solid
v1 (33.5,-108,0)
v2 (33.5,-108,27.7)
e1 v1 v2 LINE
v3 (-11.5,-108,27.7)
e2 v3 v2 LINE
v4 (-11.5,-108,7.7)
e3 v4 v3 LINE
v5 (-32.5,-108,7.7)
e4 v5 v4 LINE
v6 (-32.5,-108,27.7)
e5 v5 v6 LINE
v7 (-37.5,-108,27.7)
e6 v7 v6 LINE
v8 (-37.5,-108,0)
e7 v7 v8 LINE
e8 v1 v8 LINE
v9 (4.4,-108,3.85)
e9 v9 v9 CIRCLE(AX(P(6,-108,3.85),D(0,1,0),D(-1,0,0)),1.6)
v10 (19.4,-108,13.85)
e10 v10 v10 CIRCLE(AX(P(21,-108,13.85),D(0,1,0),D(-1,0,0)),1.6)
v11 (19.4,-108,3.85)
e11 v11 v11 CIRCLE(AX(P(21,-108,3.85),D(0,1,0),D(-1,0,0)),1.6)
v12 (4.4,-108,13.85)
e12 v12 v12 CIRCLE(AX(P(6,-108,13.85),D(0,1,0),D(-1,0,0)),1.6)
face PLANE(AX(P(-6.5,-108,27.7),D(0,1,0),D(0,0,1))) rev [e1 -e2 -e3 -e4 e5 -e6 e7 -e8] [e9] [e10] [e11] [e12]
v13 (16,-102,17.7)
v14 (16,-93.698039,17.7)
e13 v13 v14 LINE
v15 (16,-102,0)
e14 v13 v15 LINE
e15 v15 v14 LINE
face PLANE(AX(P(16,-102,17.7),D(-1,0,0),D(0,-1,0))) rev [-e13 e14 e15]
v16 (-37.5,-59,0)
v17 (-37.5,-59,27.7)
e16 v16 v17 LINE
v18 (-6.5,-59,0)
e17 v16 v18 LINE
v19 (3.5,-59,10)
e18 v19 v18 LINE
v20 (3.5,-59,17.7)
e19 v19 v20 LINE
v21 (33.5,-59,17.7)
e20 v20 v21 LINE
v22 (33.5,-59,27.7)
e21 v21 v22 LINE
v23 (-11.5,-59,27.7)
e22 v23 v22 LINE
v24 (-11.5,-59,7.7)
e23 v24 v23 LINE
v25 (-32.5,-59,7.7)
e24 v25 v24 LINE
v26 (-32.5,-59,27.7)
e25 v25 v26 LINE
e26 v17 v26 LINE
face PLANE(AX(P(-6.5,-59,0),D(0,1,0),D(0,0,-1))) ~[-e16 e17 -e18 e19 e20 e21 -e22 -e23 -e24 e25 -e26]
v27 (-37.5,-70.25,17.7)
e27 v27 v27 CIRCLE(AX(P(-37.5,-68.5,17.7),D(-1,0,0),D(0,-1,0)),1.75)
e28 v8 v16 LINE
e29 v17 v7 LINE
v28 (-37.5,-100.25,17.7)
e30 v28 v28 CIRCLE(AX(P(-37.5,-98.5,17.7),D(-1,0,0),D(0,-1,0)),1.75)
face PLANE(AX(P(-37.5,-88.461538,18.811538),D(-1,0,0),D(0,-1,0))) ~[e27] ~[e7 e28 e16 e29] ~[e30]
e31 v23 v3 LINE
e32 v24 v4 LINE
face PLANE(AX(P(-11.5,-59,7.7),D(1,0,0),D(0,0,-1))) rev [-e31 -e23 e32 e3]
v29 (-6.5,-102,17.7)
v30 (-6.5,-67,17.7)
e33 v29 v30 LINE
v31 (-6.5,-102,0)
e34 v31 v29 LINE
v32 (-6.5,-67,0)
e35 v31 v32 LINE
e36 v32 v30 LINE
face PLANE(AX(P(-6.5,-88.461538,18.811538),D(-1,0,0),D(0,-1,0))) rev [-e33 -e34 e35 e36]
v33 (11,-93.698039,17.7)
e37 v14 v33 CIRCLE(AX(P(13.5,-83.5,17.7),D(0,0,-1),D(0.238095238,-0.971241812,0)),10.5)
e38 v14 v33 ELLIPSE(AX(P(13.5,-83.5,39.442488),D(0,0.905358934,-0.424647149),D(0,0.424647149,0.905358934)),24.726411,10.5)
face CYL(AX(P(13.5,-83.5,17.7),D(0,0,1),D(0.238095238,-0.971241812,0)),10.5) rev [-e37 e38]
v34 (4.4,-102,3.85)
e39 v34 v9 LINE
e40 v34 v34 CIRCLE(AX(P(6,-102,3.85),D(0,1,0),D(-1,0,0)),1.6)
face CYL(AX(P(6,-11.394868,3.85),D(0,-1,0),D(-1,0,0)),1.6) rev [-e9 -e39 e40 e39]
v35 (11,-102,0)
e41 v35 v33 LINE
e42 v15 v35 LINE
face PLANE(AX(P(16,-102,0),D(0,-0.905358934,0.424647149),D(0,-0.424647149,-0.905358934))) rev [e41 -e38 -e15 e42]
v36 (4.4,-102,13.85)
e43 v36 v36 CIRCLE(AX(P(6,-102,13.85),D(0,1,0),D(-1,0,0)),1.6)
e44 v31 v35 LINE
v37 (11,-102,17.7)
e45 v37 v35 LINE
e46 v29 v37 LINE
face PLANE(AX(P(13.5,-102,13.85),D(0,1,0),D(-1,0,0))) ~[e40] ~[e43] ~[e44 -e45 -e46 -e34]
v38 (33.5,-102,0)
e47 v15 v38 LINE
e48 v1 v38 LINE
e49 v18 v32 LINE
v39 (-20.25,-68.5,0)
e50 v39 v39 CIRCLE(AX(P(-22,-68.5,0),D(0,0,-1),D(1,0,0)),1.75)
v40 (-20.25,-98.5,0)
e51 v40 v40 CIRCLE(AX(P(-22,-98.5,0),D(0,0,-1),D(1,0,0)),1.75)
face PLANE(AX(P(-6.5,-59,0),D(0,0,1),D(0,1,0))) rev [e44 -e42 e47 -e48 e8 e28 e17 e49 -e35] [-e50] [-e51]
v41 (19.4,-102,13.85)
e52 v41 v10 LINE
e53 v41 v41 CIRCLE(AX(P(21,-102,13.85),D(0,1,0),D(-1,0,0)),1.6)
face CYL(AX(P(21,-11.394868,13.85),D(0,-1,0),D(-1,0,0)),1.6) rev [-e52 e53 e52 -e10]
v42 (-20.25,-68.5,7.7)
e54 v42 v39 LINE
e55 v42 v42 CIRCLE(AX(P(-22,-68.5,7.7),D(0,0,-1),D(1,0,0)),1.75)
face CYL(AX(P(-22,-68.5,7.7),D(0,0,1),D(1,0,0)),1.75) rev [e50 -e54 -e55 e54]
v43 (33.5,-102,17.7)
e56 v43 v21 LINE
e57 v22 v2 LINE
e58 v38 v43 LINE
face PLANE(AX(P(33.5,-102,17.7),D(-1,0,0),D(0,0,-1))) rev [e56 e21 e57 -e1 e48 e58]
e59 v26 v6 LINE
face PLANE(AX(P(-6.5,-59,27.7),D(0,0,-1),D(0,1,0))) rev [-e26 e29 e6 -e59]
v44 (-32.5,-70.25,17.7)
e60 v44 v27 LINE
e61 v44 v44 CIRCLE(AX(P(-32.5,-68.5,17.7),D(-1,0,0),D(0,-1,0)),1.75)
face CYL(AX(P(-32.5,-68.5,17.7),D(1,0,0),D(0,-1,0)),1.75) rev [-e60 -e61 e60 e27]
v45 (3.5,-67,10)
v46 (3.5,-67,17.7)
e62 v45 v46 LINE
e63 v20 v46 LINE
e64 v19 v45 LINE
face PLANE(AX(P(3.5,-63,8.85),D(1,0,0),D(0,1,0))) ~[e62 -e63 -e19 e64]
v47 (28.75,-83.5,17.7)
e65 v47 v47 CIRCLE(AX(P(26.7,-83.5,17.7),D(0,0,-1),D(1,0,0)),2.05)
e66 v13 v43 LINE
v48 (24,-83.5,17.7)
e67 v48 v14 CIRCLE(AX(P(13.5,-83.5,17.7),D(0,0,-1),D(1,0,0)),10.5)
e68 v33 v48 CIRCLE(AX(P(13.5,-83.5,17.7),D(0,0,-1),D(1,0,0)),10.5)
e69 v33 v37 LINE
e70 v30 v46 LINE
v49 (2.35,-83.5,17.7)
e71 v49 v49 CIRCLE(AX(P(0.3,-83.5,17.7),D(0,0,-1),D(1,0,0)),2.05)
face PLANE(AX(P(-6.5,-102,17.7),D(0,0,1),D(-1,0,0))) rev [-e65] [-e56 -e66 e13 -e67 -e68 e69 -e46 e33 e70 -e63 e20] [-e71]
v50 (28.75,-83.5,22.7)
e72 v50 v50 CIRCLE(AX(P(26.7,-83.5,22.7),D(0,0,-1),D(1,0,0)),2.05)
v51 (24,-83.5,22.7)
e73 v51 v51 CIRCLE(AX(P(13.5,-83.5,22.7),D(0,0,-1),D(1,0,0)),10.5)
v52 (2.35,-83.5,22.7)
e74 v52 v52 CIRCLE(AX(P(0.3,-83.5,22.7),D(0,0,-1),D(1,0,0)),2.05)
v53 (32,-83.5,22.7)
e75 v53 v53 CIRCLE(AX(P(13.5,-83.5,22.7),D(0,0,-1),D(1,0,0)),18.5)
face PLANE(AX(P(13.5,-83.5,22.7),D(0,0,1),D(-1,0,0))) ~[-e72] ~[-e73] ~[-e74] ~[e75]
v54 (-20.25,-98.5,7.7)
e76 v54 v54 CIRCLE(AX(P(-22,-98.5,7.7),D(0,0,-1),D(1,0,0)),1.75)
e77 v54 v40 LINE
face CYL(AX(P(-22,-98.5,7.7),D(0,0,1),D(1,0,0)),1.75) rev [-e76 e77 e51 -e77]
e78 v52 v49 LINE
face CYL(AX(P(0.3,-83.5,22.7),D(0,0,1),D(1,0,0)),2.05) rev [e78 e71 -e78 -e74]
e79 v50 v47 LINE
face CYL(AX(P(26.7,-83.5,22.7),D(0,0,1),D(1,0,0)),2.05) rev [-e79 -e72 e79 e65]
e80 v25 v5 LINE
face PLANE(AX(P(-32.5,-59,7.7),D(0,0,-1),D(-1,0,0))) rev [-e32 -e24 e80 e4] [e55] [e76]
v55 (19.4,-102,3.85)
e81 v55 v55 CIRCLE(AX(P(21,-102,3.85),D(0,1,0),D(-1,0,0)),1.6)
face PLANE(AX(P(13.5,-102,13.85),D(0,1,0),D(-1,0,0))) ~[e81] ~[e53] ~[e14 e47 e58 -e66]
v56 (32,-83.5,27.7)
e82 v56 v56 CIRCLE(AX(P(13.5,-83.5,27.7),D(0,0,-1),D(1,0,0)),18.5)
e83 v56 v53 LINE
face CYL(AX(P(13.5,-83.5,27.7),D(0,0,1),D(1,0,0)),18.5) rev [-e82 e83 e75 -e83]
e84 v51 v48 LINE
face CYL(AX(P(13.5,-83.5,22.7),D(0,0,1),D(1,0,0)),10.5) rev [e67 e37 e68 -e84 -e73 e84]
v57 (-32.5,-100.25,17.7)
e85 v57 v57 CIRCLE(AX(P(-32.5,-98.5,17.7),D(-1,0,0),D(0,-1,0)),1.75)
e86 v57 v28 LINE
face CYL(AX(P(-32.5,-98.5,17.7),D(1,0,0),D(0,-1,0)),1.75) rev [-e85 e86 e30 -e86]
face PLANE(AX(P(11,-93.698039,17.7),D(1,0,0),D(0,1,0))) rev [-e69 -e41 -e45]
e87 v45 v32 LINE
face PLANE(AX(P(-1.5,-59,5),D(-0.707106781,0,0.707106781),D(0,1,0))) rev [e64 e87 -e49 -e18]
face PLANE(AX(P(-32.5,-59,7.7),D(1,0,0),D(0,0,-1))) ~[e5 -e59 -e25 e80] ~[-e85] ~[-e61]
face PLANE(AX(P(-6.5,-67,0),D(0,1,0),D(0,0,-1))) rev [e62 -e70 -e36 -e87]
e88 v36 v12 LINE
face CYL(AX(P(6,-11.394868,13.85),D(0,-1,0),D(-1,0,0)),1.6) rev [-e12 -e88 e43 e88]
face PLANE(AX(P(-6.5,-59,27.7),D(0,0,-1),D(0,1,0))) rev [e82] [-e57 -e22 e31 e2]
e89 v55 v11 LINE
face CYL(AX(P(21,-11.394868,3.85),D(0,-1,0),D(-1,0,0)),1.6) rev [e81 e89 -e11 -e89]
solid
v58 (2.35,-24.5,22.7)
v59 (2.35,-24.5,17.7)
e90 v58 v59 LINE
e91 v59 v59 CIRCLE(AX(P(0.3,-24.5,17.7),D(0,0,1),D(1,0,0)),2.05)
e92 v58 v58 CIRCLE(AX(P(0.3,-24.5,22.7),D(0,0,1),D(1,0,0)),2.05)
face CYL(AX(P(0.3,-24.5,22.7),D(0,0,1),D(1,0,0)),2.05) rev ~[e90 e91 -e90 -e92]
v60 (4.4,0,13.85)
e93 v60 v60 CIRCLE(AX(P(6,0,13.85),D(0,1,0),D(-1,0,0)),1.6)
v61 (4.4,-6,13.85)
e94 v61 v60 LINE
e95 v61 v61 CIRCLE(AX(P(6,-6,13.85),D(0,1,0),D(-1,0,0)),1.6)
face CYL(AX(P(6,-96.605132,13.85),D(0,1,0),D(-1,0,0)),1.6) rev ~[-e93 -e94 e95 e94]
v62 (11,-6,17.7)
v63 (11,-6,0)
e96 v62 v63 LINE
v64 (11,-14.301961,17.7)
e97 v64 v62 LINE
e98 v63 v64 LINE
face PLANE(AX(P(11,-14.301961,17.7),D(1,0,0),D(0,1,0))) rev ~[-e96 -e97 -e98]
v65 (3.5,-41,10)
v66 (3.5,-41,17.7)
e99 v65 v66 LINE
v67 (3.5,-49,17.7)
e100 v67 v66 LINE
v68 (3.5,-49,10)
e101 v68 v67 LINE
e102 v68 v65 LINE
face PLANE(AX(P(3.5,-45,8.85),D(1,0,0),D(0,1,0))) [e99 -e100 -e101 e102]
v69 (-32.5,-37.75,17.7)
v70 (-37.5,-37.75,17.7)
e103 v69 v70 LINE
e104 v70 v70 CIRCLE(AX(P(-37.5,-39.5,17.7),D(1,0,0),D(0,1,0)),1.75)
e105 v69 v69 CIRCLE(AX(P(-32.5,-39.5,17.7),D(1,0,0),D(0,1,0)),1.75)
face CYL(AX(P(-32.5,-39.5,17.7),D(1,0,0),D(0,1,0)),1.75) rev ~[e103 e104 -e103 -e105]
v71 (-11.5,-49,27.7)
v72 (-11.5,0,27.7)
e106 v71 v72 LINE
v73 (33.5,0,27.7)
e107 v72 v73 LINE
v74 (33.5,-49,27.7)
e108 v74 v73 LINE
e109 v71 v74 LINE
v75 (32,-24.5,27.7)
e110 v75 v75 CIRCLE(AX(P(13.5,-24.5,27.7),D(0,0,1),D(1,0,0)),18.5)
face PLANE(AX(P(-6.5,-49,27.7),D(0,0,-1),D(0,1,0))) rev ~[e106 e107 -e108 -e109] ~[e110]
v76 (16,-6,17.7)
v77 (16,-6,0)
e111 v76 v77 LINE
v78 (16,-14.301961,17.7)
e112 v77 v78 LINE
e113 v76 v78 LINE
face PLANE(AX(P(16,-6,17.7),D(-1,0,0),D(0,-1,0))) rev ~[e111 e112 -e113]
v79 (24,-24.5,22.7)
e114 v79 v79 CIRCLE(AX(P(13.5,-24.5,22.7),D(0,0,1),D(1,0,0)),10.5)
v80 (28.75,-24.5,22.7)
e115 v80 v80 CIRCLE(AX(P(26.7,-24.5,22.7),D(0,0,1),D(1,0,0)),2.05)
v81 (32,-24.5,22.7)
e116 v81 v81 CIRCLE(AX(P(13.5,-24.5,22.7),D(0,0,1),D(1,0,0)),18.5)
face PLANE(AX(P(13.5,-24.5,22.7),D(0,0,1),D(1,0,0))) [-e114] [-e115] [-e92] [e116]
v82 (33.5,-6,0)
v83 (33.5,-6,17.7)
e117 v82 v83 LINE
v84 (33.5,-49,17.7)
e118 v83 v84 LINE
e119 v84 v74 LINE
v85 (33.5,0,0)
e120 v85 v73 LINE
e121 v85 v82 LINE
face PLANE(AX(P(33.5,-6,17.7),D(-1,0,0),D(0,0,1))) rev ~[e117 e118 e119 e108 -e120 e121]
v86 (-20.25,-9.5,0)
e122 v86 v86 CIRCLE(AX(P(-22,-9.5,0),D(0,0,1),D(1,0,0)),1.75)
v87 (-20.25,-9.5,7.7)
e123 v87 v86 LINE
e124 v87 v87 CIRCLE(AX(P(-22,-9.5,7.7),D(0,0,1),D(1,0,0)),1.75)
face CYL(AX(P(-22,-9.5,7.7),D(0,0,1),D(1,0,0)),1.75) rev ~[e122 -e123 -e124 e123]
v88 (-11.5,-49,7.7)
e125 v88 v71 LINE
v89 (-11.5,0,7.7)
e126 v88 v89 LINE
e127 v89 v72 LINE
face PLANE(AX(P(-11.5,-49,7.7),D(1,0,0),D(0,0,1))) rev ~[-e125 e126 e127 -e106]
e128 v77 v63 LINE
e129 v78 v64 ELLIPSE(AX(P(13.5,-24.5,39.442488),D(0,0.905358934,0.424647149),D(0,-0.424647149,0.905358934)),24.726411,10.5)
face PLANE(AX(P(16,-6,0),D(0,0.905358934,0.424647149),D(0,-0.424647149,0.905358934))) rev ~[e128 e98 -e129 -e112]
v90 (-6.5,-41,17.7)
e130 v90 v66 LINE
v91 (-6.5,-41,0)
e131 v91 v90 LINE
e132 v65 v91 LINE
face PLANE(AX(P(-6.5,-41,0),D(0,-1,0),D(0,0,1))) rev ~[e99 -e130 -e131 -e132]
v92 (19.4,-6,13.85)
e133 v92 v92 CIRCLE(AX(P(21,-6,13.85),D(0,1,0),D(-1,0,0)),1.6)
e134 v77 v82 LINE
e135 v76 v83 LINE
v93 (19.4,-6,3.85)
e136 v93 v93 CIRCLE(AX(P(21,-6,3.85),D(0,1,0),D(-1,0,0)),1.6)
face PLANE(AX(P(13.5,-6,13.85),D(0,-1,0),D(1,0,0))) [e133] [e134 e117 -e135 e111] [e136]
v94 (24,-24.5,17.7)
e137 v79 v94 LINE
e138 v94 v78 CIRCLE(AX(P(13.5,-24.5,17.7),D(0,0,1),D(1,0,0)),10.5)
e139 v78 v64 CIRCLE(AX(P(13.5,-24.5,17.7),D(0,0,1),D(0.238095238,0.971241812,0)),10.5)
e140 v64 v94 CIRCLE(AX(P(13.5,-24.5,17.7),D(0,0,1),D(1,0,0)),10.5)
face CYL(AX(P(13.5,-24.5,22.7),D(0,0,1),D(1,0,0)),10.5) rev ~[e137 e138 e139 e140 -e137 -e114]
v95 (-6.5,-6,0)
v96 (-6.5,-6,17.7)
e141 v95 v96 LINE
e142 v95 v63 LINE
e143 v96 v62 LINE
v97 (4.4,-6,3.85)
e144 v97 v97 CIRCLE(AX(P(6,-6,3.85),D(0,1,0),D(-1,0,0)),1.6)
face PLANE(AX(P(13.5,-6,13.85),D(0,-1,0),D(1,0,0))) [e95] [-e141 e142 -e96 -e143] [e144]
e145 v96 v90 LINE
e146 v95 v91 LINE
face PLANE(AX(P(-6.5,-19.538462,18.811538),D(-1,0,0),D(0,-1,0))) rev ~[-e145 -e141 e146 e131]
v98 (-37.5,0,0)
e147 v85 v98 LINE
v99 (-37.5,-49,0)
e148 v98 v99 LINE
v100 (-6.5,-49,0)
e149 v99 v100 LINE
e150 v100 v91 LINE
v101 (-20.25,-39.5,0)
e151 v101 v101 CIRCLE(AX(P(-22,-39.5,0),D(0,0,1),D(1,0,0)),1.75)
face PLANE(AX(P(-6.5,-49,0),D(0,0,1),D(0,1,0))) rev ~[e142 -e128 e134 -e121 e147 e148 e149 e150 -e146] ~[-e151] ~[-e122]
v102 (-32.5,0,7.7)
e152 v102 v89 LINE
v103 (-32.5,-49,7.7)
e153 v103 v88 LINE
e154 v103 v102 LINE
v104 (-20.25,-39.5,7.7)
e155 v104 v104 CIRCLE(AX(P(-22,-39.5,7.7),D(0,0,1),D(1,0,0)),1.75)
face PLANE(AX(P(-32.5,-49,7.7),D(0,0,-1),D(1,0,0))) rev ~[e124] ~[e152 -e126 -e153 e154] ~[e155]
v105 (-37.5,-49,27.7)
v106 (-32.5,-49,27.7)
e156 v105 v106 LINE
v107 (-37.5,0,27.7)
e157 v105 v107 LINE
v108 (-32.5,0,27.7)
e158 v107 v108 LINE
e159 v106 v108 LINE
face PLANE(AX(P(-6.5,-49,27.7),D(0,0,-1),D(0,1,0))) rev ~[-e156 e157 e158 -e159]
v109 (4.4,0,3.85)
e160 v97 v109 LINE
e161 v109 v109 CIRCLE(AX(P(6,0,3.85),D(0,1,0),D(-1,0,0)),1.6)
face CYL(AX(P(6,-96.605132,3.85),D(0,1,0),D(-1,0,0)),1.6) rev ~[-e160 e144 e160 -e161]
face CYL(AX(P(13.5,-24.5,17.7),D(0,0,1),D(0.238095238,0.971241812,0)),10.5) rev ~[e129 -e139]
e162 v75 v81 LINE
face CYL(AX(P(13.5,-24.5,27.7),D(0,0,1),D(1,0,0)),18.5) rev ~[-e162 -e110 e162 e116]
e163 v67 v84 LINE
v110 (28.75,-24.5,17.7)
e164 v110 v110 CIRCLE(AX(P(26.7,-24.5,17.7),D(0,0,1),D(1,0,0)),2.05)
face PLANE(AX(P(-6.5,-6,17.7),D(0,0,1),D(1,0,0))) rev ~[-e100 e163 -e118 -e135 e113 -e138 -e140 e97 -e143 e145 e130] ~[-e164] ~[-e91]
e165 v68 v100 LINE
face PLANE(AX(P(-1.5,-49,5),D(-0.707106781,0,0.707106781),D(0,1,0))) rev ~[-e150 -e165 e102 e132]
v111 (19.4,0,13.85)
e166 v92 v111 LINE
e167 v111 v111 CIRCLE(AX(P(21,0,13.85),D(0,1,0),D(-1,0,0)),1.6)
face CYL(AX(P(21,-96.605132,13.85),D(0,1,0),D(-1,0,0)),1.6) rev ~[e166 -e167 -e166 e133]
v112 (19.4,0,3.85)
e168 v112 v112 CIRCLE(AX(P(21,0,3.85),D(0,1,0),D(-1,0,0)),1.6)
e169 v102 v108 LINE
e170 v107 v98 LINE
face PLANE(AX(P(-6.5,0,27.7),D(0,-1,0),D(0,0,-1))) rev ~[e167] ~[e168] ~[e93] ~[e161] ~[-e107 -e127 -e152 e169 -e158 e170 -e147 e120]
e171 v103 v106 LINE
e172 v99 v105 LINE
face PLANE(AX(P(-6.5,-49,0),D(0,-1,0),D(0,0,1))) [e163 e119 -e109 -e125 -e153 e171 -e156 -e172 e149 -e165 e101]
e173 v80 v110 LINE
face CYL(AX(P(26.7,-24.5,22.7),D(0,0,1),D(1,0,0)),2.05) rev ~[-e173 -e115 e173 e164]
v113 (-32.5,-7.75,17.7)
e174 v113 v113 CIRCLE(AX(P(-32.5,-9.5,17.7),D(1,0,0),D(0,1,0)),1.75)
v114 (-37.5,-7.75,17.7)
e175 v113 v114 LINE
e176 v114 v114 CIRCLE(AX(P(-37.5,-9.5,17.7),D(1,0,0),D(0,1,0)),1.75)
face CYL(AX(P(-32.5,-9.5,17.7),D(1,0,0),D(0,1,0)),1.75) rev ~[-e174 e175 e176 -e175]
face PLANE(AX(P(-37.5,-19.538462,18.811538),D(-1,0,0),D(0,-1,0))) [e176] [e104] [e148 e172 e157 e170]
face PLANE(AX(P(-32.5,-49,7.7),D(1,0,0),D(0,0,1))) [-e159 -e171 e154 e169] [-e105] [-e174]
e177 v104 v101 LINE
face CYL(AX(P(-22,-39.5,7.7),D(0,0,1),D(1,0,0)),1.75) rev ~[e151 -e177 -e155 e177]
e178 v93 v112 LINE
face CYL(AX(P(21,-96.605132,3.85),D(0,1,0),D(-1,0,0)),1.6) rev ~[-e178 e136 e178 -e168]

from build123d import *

# Parameters (mm, degrees)
F0_W      = 40
F0_H      = 27.7
F1_DEPTH  = 6
F2_W      = 40
F2_H      = 10
F3_DEPTH  = 43
F4_R      = 18.5
F5_DEPTH  = 5
F6_R      = 10.5
F6_R_2    = 2.05
F7_DEPTH  = 22.701
F8_W      = 43
F8_H      = 17.7
F9_DEPTH  = 31
F10_W     = 21
F10_H     = 20
F11_DEPTH = 49.001
F13_DEPTH = 17.7
F15_DEPTH = 5
F16_W     = 8
F16_H     = 17.7
F17_DEPTH = 10
F18_R     = 1.75
F19_DEPTH = 7.701
F20_R     = 1.75
F21_DEPTH = 5.001
F23_D     = 3.2
F24_SIZE  = 10


# Not quite as in the source:
# - a feature names something its author has since deleted; it is built from what else it names


with BuildPart() as f1:
    # F0 (on Front) → F1 (new body)
    with BuildSketch(Plane.XZ):
        with Locations((13.5, 13.85)):
            Rectangle(F0_W, F0_H)
    extrude(amount=F1_DEPTH)

    # F2 (on face) → F3 (join)
    with BuildSketch(Plane.XZ.offset(6)):
        with Locations((13.5, 22.7)):
            Rectangle(F2_W, F2_H)
    extrude(amount=F3_DEPTH)

    # F4 (on face) → F5 (cut)
    with BuildSketch(Plane.XY.offset(27.7)):
        with Locations((13.5, -24.5)):
            Circle(F4_R)
    extrude(amount=-F5_DEPTH, mode=Mode.SUBTRACT)

    # F6 (on face) → F7 (cut, through all)
    with BuildSketch(Plane.XY.offset(22.7)):
        with Locations((13.5, -24.5)):
            Circle(F6_R)
        with Locations((26.7, -24.5)):
            Circle(F6_R_2)
        with Locations((0.3, -24.5)):
            Circle(F6_R_2)
    extrude(amount=-F7_DEPTH, mode=Mode.SUBTRACT)

    # F8 (on face) → F9 (join)
    with BuildSketch(Plane(origin=(-6.5, 0, 0), x_dir=(0, -1, 0), z_dir=(-1, 0, 0))):
        Polygon((0, 27.7), (0, 0), (6, 0), (6, 17.7), (49, 17.7), (49, 27.7), align=None)
        with Locations((27.5, 8.85)):
            Rectangle(F8_W, F8_H)
    extrude(amount=F9_DEPTH)

    # F10 (on face) → F11 (cut, through all)
    with BuildSketch(Plane.XZ.offset(49)):
        with Locations((-22, 17.7)):
            Rectangle(F10_W, F10_H)
    extrude(amount=-F11_DEPTH, mode=Mode.SUBTRACT)

    # F12 (on face) → F13 (join, through all)
    with BuildSketch(Plane(origin=(0, 0, 17.7), x_dir=(1, 0, 0), z_dir=(0, 0, -1))):
        with BuildLine():
            Line((11, 14.3019609728), (11, 6))
            Line((11, 6), (16, 6))
            Line((16, 6), (16, 14.3019609728))
            ThreePointArc((16, 14.3019609728), (13.5, 14), (11, 14.3019609728))
        make_face()
    extrude(amount=F13_DEPTH)

    # F14 (on face) → F15 (cut, through all)
    with BuildSketch(Plane.YZ.offset(16)):
        Polygon((-6, 0), (-14.3019609728, 17.7), (-14.3019609728, 0), align=None)
    extrude(amount=-F15_DEPTH, mode=Mode.SUBTRACT)

    # F16 (on face) → F17 (join)
    with BuildSketch(Plane.YZ.offset(-6.5)):
        with Locations((-45, 8.85)):
            Rectangle(F16_W, F16_H)
    extrude(amount=F17_DEPTH)

    # F18 (on face) → F19 (cut, through all)
    with BuildSketch(Plane.XY.offset(7.7)):
        with Locations((-22, -39.5)):
            Circle(F18_R)
        with Locations((-22, -9.5)):
            Circle(F18_R)
    extrude(amount=-F19_DEPTH, mode=Mode.SUBTRACT)

    # F20 (on face) → F21 (cut, through all)
    with BuildSketch(Plane.YZ.offset(-32.5)):
        with Locations((-39.5, 17.7)):
            Circle(F20_R)
        with Locations((-9.5, 17.7)):
            Circle(F20_R)
    extrude(amount=-F21_DEPTH, mode=Mode.SUBTRACT)

    # F23 (through all)
    with Locations(Plane.XZ.offset(6)):
        with Locations((6, 3.85), (6, 13.85), (21, 13.85), (21, 3.85)):
            Hole(F23_D / 2)

    # F24
    f24_edges = [f1.edges().sort_by_distance(p)[0] for p in [
        (3.5, -45, 0),
    ]]
    chamfer(f24_edges, length=F24_SIZE)


with BuildPart() as f26_1:
    # F26: instance of F1
    add(f1.part.mirror(Plane(origin=(-4.6859618239, -54, 15.4693779987), x_dir=(1, 0, 0), z_dir=(0, -1, 0))))


solid = Compound([f1.part, f26_1.part])
